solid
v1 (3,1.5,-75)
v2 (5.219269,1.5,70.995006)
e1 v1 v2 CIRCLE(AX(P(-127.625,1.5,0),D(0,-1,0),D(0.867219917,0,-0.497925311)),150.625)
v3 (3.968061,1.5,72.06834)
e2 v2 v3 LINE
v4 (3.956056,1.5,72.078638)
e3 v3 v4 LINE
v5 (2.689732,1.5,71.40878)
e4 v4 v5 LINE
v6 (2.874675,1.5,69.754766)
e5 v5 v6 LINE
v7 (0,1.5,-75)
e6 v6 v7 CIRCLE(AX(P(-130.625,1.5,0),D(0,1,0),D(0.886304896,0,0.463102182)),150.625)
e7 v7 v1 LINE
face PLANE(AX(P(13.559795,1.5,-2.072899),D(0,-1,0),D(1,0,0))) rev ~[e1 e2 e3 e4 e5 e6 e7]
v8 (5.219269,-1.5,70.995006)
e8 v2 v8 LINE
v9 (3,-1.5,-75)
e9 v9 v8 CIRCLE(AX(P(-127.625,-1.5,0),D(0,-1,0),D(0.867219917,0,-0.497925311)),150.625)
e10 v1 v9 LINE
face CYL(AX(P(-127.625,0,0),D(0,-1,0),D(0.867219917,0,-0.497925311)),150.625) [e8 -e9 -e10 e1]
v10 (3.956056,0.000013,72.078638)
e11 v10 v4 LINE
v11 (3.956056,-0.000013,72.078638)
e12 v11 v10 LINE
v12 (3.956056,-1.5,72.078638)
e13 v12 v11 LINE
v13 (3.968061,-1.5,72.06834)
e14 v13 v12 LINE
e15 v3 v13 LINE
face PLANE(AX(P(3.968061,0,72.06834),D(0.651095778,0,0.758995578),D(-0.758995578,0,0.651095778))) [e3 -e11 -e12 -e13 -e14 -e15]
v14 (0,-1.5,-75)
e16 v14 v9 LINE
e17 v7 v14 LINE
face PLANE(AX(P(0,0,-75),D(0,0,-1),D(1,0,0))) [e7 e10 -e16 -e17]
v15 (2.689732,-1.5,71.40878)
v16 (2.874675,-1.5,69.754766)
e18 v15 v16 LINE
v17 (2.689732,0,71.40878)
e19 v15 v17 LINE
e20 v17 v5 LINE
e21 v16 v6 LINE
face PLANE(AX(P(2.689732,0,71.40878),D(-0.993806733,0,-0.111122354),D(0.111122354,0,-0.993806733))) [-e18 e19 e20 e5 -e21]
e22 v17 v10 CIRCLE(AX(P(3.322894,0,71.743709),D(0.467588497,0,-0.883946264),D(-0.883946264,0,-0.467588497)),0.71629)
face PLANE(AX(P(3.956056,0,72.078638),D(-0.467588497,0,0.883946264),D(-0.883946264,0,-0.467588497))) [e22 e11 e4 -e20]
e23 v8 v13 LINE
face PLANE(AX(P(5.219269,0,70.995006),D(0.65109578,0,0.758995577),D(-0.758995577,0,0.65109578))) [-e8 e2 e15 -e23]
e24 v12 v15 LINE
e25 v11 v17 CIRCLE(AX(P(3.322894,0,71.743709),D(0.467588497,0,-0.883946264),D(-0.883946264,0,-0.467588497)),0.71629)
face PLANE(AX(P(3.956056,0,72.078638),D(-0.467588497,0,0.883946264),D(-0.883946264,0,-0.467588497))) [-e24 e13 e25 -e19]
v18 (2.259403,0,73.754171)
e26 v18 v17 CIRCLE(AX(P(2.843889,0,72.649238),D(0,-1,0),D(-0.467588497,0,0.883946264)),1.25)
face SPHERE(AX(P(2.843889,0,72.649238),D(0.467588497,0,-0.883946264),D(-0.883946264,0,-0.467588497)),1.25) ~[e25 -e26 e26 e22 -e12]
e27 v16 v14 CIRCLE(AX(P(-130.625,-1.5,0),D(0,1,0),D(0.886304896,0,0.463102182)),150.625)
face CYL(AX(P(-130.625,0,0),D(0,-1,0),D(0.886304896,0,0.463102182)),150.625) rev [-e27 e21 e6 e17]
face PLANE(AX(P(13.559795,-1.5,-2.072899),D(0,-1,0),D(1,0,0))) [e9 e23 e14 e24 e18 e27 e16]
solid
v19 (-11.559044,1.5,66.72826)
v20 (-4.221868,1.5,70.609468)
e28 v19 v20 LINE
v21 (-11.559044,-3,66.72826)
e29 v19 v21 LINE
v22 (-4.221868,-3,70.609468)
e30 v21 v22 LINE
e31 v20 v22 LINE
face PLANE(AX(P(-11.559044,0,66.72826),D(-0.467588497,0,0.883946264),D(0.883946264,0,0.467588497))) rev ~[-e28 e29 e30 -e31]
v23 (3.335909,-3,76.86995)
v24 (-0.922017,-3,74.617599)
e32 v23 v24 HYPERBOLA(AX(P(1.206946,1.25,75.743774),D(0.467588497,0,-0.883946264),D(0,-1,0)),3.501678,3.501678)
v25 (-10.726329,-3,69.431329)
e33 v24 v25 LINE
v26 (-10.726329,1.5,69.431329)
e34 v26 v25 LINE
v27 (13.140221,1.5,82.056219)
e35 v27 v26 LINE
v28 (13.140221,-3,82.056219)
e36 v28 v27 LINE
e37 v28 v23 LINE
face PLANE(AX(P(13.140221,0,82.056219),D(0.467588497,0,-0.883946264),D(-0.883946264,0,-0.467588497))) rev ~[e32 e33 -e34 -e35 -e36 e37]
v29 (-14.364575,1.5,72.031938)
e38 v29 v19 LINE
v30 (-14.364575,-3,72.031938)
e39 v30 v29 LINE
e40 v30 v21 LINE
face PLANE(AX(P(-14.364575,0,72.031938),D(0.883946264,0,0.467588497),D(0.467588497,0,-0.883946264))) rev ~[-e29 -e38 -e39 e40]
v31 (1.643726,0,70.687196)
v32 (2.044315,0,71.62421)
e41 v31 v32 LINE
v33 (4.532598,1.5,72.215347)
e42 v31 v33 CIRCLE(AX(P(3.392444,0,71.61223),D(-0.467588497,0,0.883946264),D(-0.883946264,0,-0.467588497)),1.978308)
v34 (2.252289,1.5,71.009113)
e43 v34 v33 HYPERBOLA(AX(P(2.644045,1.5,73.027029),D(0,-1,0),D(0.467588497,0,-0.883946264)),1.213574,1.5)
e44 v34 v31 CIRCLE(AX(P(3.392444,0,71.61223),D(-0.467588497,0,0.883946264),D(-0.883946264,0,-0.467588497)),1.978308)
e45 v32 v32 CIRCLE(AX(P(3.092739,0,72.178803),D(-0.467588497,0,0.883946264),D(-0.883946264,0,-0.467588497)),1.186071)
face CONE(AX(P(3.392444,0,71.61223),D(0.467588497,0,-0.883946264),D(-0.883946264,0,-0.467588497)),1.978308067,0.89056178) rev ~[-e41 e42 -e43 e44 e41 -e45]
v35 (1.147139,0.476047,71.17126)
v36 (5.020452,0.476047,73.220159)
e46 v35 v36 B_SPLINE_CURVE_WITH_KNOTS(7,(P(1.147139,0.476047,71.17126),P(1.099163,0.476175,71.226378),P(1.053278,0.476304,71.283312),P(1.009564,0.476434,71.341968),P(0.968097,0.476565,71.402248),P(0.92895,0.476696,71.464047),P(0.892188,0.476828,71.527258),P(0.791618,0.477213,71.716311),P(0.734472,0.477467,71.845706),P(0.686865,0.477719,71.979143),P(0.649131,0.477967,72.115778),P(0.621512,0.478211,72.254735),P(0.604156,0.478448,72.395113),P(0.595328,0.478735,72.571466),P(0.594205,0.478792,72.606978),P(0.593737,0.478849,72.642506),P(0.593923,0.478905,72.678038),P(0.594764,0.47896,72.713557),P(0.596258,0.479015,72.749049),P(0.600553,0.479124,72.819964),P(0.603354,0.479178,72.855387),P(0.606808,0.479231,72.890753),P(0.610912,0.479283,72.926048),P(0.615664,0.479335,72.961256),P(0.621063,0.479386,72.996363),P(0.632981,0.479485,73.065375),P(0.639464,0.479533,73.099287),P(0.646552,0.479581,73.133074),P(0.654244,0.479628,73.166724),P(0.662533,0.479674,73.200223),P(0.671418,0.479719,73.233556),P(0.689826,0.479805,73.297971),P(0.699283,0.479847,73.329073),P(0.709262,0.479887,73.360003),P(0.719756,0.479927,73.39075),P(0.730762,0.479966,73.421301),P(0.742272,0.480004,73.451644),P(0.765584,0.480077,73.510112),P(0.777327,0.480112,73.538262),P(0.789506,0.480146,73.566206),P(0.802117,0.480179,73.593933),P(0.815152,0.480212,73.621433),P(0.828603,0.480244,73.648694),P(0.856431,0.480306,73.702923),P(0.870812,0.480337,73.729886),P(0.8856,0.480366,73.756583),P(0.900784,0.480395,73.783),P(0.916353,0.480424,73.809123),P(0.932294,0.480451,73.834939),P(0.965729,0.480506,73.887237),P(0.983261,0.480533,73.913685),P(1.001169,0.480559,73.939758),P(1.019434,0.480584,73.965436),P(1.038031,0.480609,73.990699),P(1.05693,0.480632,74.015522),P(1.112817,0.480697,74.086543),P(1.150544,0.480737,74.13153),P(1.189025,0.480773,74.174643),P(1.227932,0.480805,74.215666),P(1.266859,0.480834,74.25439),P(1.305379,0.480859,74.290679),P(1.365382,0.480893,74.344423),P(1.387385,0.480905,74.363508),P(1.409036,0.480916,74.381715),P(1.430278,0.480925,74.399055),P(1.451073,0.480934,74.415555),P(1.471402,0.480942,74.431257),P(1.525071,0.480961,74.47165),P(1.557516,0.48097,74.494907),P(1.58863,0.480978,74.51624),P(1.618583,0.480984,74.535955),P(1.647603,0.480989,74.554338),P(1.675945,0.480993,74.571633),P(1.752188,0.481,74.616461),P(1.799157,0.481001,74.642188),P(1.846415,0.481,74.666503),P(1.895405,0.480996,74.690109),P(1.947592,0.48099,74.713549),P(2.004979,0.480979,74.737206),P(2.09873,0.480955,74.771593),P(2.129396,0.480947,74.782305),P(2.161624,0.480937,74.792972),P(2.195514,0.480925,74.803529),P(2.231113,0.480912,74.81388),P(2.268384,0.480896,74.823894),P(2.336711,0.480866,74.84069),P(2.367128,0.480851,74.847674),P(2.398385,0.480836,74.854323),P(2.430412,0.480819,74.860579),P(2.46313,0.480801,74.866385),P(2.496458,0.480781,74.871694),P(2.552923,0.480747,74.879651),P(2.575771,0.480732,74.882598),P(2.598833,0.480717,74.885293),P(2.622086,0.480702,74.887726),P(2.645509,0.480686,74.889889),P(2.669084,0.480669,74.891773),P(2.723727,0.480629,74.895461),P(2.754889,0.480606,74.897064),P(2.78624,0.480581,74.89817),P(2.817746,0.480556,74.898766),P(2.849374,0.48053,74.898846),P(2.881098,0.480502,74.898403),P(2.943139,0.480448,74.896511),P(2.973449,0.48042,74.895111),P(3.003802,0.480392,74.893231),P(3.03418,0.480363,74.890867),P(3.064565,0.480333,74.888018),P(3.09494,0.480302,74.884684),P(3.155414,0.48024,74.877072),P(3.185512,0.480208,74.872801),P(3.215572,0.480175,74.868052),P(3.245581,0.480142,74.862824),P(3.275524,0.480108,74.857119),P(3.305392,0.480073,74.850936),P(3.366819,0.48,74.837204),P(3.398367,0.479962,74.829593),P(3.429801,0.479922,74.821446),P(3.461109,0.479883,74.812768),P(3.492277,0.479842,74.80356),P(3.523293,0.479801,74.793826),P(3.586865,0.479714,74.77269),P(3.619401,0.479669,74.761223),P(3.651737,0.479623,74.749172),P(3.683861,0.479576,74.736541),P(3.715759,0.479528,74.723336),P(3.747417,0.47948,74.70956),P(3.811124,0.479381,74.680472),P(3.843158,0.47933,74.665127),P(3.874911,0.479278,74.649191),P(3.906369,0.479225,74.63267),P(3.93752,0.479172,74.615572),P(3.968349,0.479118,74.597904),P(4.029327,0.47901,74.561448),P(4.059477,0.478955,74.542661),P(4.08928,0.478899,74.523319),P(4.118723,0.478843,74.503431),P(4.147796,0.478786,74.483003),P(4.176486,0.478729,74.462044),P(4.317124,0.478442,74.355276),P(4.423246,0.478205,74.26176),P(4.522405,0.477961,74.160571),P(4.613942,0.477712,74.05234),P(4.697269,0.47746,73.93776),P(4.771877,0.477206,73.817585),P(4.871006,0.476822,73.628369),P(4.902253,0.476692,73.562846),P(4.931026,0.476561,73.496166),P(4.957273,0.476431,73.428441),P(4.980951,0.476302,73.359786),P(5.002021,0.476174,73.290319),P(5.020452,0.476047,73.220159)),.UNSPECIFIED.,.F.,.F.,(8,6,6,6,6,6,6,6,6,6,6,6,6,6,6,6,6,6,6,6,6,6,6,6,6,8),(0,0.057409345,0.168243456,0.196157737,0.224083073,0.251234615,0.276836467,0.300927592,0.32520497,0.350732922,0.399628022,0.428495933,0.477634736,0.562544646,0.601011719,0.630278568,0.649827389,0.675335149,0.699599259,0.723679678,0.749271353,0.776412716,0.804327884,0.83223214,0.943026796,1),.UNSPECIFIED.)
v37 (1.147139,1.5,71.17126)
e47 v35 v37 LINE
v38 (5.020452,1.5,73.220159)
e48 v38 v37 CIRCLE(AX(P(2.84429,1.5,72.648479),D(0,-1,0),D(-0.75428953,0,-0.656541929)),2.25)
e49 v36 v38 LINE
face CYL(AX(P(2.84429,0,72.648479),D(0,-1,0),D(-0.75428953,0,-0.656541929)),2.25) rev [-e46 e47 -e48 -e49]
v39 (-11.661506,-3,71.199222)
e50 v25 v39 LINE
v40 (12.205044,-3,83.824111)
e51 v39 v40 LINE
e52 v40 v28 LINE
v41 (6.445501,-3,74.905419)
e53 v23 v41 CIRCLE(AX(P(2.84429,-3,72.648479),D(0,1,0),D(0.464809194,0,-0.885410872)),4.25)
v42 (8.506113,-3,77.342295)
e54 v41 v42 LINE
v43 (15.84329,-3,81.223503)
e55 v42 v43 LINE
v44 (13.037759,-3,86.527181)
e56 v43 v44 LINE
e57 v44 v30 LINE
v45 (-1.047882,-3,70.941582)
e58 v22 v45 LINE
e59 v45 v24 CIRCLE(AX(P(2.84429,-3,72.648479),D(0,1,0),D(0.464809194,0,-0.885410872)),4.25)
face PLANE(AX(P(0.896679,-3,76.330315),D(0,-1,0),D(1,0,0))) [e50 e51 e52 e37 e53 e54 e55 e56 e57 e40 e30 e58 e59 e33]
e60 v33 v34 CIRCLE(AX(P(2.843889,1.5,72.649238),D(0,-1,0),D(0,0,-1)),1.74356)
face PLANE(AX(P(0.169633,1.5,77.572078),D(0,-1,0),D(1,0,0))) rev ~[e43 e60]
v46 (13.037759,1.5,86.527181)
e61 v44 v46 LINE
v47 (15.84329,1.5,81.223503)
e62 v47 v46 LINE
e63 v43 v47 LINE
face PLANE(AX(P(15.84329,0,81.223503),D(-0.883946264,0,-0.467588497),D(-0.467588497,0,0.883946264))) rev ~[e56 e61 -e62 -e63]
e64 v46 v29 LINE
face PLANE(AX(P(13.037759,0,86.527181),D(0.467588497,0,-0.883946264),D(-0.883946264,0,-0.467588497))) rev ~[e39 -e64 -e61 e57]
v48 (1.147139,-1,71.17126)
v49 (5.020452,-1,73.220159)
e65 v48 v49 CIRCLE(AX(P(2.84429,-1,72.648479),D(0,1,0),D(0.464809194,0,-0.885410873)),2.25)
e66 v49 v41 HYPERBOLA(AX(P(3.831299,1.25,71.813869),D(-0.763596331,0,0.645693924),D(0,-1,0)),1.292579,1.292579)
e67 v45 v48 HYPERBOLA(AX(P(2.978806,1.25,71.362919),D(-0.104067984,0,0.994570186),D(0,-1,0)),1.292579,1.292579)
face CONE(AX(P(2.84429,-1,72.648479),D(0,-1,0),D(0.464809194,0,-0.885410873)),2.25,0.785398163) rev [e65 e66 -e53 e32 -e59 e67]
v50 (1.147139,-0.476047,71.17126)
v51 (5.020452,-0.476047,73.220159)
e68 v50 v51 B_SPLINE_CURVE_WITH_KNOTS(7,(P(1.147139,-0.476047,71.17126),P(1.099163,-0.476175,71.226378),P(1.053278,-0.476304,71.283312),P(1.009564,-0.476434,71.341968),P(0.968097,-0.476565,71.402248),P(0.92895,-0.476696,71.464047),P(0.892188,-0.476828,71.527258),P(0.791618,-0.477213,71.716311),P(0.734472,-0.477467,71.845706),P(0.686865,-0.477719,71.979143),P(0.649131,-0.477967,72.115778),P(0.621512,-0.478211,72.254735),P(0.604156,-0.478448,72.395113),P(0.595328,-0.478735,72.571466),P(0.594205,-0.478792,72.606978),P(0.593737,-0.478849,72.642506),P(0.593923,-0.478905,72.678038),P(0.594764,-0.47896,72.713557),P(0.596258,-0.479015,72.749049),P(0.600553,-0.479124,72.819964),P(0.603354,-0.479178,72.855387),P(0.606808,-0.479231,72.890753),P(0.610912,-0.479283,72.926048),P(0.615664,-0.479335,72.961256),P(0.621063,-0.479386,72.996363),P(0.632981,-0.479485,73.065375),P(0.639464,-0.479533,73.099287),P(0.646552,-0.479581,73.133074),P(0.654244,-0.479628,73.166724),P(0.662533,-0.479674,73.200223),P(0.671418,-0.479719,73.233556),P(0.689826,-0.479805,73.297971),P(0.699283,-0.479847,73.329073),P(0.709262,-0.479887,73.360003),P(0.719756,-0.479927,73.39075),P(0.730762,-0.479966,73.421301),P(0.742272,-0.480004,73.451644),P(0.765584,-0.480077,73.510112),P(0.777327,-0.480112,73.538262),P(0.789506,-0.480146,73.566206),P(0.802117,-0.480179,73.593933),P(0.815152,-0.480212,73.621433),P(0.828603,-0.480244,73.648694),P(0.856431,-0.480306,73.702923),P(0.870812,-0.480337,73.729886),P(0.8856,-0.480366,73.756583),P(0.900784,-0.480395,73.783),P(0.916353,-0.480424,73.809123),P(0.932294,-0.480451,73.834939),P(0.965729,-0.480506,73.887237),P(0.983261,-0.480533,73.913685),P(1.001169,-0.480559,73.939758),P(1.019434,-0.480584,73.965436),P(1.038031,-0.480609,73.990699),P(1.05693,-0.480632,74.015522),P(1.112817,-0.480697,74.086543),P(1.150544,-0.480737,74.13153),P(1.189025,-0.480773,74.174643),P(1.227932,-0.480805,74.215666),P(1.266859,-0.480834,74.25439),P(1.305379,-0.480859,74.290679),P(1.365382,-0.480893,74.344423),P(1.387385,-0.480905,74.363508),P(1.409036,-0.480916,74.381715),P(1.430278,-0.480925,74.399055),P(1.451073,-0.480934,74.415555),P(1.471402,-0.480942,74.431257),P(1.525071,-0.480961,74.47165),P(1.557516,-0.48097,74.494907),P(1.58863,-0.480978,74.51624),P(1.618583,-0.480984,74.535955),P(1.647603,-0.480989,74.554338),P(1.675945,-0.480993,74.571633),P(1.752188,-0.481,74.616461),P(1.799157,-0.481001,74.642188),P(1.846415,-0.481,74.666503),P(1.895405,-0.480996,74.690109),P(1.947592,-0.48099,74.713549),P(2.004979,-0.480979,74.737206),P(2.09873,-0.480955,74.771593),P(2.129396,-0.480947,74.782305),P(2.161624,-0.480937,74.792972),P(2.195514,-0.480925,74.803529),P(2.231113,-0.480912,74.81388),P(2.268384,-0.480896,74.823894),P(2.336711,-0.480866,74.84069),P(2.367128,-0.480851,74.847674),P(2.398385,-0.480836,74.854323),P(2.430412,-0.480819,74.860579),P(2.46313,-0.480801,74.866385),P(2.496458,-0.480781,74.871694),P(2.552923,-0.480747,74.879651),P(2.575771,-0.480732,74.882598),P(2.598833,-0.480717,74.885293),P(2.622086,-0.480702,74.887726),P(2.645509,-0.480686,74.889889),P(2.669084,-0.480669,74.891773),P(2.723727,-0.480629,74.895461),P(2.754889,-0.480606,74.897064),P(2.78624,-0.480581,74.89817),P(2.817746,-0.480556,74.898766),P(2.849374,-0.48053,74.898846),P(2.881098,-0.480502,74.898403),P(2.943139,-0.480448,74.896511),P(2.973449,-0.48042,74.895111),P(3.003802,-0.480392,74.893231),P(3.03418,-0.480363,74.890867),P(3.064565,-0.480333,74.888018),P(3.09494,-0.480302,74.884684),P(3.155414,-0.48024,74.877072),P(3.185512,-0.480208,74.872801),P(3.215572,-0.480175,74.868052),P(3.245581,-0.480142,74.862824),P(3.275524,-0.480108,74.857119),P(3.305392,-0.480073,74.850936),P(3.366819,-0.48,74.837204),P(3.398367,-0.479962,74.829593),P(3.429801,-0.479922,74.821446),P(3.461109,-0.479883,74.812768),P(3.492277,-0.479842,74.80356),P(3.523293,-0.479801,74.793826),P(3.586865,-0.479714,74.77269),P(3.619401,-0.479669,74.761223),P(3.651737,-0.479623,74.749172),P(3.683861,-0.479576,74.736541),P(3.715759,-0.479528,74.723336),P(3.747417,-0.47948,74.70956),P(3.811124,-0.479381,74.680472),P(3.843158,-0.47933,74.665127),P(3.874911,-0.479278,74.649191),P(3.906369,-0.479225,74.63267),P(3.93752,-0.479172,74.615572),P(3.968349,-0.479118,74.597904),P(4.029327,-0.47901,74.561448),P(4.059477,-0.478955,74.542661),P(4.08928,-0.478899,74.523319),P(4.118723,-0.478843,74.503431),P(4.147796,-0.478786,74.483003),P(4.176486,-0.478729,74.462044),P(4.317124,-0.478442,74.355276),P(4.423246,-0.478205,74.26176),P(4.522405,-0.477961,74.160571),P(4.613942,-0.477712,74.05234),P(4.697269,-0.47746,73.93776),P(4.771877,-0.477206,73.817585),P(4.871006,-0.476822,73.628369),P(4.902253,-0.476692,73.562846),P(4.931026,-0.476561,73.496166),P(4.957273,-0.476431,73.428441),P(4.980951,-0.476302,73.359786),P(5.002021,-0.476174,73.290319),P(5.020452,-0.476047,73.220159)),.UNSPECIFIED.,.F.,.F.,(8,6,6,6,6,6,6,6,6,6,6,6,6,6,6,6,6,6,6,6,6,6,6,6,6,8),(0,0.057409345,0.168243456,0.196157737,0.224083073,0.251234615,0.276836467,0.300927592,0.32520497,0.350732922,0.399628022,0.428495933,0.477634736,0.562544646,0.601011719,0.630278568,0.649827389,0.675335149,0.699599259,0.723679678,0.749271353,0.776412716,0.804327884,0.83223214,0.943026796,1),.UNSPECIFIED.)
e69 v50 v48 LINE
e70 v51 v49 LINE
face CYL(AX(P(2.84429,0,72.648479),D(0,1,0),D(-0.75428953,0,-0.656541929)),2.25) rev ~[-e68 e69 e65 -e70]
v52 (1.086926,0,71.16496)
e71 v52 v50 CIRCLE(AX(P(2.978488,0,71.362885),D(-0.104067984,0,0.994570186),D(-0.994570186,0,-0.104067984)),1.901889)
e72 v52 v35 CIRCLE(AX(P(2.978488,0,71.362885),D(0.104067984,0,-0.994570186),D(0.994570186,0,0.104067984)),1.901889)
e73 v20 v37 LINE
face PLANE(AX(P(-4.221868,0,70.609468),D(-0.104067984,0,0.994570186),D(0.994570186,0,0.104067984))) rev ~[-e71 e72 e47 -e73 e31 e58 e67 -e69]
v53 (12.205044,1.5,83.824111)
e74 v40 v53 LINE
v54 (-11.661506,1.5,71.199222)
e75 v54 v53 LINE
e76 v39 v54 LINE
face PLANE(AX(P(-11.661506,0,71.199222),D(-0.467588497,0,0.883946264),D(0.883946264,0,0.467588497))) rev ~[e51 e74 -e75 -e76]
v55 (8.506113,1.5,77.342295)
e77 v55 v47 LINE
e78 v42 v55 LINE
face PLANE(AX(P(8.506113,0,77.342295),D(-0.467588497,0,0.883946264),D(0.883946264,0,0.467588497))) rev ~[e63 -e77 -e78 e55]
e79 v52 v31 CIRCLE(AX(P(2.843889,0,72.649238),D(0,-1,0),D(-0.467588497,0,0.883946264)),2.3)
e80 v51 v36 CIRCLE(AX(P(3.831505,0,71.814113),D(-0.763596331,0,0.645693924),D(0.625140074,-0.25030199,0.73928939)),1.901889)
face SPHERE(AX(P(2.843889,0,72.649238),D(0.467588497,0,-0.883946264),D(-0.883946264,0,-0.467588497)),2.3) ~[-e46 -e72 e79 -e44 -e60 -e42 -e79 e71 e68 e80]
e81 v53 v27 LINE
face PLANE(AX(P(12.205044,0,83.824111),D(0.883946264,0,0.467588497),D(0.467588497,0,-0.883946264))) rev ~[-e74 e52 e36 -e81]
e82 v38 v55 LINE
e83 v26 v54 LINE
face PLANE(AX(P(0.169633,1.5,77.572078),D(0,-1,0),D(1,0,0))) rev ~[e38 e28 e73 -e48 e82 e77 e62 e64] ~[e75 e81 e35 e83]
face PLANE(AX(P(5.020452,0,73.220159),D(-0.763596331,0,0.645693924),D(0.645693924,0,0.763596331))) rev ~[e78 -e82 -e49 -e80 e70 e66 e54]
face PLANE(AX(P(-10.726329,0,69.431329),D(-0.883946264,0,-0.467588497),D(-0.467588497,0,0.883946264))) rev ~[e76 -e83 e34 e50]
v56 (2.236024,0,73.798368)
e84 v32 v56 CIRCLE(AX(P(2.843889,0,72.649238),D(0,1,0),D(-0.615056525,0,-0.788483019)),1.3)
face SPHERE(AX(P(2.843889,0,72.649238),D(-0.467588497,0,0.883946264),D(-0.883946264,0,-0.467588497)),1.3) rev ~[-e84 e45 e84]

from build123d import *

# Parameters (mm, degrees)
F1_DEPTH      = 1.5
F6_DEPTH      = 2
F6_DEPTH_BACK = 3
F8_W          = 33.8980406523
F8_H          = 26.2241512537
F9_DEPTH      = 4
F10_T2_ANGLE  = 359.64


# Not quite as in the source:
# - a fillet or chamfer that OpenCascade refuses, or shapes differently, is made with other operations: its cross-section is extruded or revolved along the edge and cut away or added


with BuildPart() as f1:
    # F0 (on Front) → F1 (new body, symmetric)
    with BuildSketch(Plane.XZ):
        with BuildLine():
            ThreePointArc((2.874675002, 69.7547661407), (19.9703072521, -2.9906619086), (0, -75))
            Line((0, -75), (3, -75))
            ThreePointArc((3, -75), (22.9826005439, -2.2893849442), (5.2192689269, 70.9950057277))
            Line((5.2192689269, 70.9950057277), (3.9680614468, 72.0683399281))
            Line((3.9680614468, 72.0683399281), (3.9560562747, 72.0786384293))
            Line((3.9560562747, 72.0786384293), (2.6897316802, 71.4087800477))
            Line((2.6897316802, 71.4087800477), (2.874675002, 69.7547661407))
        make_face()
    extrude(amount=F1_DEPTH, both=True)

    # F2 (on Front) → F11 (revolve)
    with BuildSketch(Plane.XZ):
        with BuildLine():
            Line((3.4283745063, 71.5443050188), (2.259403264, 73.7541706787))
            ThreePointArc((2.259403264, 73.7541706787), (1.7389560552, 72.0647522276), (3.4283745063, 71.5443050188))
        make_face()
    revolve(axis=Axis((2.3768325607, 0, 73.5321780745), (-0.4675884969, 0, 0.8839462639)))


with BuildPart() as f4:
    # F3 (on Front) → F4 (revolve)
    with BuildSketch(Plane.XZ):
        with BuildLine():
            ThreePointArc((2.0443154021, 71.6242099246), (1.5489133531, 72.763423537), (2.2360238391, 73.7983679919))
            Line((2.2360238391, 73.7983679919), (1.7684353422, 74.6823142558))
            ThreePointArc((1.7684353422, 74.6823142558), (0.5450086387, 72.7209986501), (1.6437255478, 70.6871960643))
            Line((1.6437255478, 70.6871960643), (2.0443154021, 71.6242099246))
        make_face()
    revolve(axis=Axis((2.532587825, 0, 73.2377326703), (-0.4675884969, 0, 0.8839462639)))

    # F5 (on Front) → F6 (join, two sides)
    with BuildSketch(Plane.XZ) as f6_sk:
        with BuildLine():
            Line((-14.3645751176, 72.0319375121), (-11.559044136, 66.7282599284))
            Line((-11.559044136, 66.7282599284), (-4.2218675739, 70.6094679841))
            Line((-4.2218675739, 70.6094679841), (1.1471386437, 71.1712600625))
            ThreePointArc((1.1471386437, 71.1712600625), (1.7922159684, 74.637358497), (5.0204523013, 73.2201593963))
            Line((5.0204523013, 73.2201593963), (8.506113484, 77.3422952775))
            Line((8.506113484, 77.3422952775), (15.8432900462, 81.2235033332))
            Line((15.8432900462, 81.2235033332), (13.0377590646, 86.5271809169))
            Line((13.0377590646, 86.5271809169), (-14.3645751176, 72.0319375121))
        make_face()
        Polygon((-10.726328602, 69.4313294501), (-11.6615055959, 71.199221978), (12.2050435306, 83.8241113951), (13.1402205245, 82.0562188673), align=None, mode=Mode.SUBTRACT)
    extrude(amount=-F6_DEPTH)
    extrude(f6_sk.sketch, amount=F6_DEPTH_BACK)

    # F8 (on offset) → F9 (cut)
    with BuildSketch(Plane.XZ.offset(-1.5)):
        with Locations((0.1696329564, 77.5720775127)):
            Rectangle(F8_W, F8_H)
    extrude(amount=-F9_DEPTH, mode=Mode.SUBTRACT)

    # F10: chamfer of 2 on 1 edges, made by hand

    # F10_s1 → F10_t2 (revolve, cut)
    with BuildSketch(Plane(origin=(32.1280601549, 0, 16.8660881044), x_dir=(0, 1, 0), z_dir=(0.885410872, 0, 0.464809195))):
        Polygon((-1, 60.7517013138), (-3, 58.7517013138), (-3, 60.7517013138), align=None)
    revolve(axis=Axis((2.8442900865, -3, 72.6484794032), (0, 1, 0)), revolution_arc=F10_T2_ANGLE, mode=Mode.SUBTRACT)


solid = Compound([f1.part, f4.part])
